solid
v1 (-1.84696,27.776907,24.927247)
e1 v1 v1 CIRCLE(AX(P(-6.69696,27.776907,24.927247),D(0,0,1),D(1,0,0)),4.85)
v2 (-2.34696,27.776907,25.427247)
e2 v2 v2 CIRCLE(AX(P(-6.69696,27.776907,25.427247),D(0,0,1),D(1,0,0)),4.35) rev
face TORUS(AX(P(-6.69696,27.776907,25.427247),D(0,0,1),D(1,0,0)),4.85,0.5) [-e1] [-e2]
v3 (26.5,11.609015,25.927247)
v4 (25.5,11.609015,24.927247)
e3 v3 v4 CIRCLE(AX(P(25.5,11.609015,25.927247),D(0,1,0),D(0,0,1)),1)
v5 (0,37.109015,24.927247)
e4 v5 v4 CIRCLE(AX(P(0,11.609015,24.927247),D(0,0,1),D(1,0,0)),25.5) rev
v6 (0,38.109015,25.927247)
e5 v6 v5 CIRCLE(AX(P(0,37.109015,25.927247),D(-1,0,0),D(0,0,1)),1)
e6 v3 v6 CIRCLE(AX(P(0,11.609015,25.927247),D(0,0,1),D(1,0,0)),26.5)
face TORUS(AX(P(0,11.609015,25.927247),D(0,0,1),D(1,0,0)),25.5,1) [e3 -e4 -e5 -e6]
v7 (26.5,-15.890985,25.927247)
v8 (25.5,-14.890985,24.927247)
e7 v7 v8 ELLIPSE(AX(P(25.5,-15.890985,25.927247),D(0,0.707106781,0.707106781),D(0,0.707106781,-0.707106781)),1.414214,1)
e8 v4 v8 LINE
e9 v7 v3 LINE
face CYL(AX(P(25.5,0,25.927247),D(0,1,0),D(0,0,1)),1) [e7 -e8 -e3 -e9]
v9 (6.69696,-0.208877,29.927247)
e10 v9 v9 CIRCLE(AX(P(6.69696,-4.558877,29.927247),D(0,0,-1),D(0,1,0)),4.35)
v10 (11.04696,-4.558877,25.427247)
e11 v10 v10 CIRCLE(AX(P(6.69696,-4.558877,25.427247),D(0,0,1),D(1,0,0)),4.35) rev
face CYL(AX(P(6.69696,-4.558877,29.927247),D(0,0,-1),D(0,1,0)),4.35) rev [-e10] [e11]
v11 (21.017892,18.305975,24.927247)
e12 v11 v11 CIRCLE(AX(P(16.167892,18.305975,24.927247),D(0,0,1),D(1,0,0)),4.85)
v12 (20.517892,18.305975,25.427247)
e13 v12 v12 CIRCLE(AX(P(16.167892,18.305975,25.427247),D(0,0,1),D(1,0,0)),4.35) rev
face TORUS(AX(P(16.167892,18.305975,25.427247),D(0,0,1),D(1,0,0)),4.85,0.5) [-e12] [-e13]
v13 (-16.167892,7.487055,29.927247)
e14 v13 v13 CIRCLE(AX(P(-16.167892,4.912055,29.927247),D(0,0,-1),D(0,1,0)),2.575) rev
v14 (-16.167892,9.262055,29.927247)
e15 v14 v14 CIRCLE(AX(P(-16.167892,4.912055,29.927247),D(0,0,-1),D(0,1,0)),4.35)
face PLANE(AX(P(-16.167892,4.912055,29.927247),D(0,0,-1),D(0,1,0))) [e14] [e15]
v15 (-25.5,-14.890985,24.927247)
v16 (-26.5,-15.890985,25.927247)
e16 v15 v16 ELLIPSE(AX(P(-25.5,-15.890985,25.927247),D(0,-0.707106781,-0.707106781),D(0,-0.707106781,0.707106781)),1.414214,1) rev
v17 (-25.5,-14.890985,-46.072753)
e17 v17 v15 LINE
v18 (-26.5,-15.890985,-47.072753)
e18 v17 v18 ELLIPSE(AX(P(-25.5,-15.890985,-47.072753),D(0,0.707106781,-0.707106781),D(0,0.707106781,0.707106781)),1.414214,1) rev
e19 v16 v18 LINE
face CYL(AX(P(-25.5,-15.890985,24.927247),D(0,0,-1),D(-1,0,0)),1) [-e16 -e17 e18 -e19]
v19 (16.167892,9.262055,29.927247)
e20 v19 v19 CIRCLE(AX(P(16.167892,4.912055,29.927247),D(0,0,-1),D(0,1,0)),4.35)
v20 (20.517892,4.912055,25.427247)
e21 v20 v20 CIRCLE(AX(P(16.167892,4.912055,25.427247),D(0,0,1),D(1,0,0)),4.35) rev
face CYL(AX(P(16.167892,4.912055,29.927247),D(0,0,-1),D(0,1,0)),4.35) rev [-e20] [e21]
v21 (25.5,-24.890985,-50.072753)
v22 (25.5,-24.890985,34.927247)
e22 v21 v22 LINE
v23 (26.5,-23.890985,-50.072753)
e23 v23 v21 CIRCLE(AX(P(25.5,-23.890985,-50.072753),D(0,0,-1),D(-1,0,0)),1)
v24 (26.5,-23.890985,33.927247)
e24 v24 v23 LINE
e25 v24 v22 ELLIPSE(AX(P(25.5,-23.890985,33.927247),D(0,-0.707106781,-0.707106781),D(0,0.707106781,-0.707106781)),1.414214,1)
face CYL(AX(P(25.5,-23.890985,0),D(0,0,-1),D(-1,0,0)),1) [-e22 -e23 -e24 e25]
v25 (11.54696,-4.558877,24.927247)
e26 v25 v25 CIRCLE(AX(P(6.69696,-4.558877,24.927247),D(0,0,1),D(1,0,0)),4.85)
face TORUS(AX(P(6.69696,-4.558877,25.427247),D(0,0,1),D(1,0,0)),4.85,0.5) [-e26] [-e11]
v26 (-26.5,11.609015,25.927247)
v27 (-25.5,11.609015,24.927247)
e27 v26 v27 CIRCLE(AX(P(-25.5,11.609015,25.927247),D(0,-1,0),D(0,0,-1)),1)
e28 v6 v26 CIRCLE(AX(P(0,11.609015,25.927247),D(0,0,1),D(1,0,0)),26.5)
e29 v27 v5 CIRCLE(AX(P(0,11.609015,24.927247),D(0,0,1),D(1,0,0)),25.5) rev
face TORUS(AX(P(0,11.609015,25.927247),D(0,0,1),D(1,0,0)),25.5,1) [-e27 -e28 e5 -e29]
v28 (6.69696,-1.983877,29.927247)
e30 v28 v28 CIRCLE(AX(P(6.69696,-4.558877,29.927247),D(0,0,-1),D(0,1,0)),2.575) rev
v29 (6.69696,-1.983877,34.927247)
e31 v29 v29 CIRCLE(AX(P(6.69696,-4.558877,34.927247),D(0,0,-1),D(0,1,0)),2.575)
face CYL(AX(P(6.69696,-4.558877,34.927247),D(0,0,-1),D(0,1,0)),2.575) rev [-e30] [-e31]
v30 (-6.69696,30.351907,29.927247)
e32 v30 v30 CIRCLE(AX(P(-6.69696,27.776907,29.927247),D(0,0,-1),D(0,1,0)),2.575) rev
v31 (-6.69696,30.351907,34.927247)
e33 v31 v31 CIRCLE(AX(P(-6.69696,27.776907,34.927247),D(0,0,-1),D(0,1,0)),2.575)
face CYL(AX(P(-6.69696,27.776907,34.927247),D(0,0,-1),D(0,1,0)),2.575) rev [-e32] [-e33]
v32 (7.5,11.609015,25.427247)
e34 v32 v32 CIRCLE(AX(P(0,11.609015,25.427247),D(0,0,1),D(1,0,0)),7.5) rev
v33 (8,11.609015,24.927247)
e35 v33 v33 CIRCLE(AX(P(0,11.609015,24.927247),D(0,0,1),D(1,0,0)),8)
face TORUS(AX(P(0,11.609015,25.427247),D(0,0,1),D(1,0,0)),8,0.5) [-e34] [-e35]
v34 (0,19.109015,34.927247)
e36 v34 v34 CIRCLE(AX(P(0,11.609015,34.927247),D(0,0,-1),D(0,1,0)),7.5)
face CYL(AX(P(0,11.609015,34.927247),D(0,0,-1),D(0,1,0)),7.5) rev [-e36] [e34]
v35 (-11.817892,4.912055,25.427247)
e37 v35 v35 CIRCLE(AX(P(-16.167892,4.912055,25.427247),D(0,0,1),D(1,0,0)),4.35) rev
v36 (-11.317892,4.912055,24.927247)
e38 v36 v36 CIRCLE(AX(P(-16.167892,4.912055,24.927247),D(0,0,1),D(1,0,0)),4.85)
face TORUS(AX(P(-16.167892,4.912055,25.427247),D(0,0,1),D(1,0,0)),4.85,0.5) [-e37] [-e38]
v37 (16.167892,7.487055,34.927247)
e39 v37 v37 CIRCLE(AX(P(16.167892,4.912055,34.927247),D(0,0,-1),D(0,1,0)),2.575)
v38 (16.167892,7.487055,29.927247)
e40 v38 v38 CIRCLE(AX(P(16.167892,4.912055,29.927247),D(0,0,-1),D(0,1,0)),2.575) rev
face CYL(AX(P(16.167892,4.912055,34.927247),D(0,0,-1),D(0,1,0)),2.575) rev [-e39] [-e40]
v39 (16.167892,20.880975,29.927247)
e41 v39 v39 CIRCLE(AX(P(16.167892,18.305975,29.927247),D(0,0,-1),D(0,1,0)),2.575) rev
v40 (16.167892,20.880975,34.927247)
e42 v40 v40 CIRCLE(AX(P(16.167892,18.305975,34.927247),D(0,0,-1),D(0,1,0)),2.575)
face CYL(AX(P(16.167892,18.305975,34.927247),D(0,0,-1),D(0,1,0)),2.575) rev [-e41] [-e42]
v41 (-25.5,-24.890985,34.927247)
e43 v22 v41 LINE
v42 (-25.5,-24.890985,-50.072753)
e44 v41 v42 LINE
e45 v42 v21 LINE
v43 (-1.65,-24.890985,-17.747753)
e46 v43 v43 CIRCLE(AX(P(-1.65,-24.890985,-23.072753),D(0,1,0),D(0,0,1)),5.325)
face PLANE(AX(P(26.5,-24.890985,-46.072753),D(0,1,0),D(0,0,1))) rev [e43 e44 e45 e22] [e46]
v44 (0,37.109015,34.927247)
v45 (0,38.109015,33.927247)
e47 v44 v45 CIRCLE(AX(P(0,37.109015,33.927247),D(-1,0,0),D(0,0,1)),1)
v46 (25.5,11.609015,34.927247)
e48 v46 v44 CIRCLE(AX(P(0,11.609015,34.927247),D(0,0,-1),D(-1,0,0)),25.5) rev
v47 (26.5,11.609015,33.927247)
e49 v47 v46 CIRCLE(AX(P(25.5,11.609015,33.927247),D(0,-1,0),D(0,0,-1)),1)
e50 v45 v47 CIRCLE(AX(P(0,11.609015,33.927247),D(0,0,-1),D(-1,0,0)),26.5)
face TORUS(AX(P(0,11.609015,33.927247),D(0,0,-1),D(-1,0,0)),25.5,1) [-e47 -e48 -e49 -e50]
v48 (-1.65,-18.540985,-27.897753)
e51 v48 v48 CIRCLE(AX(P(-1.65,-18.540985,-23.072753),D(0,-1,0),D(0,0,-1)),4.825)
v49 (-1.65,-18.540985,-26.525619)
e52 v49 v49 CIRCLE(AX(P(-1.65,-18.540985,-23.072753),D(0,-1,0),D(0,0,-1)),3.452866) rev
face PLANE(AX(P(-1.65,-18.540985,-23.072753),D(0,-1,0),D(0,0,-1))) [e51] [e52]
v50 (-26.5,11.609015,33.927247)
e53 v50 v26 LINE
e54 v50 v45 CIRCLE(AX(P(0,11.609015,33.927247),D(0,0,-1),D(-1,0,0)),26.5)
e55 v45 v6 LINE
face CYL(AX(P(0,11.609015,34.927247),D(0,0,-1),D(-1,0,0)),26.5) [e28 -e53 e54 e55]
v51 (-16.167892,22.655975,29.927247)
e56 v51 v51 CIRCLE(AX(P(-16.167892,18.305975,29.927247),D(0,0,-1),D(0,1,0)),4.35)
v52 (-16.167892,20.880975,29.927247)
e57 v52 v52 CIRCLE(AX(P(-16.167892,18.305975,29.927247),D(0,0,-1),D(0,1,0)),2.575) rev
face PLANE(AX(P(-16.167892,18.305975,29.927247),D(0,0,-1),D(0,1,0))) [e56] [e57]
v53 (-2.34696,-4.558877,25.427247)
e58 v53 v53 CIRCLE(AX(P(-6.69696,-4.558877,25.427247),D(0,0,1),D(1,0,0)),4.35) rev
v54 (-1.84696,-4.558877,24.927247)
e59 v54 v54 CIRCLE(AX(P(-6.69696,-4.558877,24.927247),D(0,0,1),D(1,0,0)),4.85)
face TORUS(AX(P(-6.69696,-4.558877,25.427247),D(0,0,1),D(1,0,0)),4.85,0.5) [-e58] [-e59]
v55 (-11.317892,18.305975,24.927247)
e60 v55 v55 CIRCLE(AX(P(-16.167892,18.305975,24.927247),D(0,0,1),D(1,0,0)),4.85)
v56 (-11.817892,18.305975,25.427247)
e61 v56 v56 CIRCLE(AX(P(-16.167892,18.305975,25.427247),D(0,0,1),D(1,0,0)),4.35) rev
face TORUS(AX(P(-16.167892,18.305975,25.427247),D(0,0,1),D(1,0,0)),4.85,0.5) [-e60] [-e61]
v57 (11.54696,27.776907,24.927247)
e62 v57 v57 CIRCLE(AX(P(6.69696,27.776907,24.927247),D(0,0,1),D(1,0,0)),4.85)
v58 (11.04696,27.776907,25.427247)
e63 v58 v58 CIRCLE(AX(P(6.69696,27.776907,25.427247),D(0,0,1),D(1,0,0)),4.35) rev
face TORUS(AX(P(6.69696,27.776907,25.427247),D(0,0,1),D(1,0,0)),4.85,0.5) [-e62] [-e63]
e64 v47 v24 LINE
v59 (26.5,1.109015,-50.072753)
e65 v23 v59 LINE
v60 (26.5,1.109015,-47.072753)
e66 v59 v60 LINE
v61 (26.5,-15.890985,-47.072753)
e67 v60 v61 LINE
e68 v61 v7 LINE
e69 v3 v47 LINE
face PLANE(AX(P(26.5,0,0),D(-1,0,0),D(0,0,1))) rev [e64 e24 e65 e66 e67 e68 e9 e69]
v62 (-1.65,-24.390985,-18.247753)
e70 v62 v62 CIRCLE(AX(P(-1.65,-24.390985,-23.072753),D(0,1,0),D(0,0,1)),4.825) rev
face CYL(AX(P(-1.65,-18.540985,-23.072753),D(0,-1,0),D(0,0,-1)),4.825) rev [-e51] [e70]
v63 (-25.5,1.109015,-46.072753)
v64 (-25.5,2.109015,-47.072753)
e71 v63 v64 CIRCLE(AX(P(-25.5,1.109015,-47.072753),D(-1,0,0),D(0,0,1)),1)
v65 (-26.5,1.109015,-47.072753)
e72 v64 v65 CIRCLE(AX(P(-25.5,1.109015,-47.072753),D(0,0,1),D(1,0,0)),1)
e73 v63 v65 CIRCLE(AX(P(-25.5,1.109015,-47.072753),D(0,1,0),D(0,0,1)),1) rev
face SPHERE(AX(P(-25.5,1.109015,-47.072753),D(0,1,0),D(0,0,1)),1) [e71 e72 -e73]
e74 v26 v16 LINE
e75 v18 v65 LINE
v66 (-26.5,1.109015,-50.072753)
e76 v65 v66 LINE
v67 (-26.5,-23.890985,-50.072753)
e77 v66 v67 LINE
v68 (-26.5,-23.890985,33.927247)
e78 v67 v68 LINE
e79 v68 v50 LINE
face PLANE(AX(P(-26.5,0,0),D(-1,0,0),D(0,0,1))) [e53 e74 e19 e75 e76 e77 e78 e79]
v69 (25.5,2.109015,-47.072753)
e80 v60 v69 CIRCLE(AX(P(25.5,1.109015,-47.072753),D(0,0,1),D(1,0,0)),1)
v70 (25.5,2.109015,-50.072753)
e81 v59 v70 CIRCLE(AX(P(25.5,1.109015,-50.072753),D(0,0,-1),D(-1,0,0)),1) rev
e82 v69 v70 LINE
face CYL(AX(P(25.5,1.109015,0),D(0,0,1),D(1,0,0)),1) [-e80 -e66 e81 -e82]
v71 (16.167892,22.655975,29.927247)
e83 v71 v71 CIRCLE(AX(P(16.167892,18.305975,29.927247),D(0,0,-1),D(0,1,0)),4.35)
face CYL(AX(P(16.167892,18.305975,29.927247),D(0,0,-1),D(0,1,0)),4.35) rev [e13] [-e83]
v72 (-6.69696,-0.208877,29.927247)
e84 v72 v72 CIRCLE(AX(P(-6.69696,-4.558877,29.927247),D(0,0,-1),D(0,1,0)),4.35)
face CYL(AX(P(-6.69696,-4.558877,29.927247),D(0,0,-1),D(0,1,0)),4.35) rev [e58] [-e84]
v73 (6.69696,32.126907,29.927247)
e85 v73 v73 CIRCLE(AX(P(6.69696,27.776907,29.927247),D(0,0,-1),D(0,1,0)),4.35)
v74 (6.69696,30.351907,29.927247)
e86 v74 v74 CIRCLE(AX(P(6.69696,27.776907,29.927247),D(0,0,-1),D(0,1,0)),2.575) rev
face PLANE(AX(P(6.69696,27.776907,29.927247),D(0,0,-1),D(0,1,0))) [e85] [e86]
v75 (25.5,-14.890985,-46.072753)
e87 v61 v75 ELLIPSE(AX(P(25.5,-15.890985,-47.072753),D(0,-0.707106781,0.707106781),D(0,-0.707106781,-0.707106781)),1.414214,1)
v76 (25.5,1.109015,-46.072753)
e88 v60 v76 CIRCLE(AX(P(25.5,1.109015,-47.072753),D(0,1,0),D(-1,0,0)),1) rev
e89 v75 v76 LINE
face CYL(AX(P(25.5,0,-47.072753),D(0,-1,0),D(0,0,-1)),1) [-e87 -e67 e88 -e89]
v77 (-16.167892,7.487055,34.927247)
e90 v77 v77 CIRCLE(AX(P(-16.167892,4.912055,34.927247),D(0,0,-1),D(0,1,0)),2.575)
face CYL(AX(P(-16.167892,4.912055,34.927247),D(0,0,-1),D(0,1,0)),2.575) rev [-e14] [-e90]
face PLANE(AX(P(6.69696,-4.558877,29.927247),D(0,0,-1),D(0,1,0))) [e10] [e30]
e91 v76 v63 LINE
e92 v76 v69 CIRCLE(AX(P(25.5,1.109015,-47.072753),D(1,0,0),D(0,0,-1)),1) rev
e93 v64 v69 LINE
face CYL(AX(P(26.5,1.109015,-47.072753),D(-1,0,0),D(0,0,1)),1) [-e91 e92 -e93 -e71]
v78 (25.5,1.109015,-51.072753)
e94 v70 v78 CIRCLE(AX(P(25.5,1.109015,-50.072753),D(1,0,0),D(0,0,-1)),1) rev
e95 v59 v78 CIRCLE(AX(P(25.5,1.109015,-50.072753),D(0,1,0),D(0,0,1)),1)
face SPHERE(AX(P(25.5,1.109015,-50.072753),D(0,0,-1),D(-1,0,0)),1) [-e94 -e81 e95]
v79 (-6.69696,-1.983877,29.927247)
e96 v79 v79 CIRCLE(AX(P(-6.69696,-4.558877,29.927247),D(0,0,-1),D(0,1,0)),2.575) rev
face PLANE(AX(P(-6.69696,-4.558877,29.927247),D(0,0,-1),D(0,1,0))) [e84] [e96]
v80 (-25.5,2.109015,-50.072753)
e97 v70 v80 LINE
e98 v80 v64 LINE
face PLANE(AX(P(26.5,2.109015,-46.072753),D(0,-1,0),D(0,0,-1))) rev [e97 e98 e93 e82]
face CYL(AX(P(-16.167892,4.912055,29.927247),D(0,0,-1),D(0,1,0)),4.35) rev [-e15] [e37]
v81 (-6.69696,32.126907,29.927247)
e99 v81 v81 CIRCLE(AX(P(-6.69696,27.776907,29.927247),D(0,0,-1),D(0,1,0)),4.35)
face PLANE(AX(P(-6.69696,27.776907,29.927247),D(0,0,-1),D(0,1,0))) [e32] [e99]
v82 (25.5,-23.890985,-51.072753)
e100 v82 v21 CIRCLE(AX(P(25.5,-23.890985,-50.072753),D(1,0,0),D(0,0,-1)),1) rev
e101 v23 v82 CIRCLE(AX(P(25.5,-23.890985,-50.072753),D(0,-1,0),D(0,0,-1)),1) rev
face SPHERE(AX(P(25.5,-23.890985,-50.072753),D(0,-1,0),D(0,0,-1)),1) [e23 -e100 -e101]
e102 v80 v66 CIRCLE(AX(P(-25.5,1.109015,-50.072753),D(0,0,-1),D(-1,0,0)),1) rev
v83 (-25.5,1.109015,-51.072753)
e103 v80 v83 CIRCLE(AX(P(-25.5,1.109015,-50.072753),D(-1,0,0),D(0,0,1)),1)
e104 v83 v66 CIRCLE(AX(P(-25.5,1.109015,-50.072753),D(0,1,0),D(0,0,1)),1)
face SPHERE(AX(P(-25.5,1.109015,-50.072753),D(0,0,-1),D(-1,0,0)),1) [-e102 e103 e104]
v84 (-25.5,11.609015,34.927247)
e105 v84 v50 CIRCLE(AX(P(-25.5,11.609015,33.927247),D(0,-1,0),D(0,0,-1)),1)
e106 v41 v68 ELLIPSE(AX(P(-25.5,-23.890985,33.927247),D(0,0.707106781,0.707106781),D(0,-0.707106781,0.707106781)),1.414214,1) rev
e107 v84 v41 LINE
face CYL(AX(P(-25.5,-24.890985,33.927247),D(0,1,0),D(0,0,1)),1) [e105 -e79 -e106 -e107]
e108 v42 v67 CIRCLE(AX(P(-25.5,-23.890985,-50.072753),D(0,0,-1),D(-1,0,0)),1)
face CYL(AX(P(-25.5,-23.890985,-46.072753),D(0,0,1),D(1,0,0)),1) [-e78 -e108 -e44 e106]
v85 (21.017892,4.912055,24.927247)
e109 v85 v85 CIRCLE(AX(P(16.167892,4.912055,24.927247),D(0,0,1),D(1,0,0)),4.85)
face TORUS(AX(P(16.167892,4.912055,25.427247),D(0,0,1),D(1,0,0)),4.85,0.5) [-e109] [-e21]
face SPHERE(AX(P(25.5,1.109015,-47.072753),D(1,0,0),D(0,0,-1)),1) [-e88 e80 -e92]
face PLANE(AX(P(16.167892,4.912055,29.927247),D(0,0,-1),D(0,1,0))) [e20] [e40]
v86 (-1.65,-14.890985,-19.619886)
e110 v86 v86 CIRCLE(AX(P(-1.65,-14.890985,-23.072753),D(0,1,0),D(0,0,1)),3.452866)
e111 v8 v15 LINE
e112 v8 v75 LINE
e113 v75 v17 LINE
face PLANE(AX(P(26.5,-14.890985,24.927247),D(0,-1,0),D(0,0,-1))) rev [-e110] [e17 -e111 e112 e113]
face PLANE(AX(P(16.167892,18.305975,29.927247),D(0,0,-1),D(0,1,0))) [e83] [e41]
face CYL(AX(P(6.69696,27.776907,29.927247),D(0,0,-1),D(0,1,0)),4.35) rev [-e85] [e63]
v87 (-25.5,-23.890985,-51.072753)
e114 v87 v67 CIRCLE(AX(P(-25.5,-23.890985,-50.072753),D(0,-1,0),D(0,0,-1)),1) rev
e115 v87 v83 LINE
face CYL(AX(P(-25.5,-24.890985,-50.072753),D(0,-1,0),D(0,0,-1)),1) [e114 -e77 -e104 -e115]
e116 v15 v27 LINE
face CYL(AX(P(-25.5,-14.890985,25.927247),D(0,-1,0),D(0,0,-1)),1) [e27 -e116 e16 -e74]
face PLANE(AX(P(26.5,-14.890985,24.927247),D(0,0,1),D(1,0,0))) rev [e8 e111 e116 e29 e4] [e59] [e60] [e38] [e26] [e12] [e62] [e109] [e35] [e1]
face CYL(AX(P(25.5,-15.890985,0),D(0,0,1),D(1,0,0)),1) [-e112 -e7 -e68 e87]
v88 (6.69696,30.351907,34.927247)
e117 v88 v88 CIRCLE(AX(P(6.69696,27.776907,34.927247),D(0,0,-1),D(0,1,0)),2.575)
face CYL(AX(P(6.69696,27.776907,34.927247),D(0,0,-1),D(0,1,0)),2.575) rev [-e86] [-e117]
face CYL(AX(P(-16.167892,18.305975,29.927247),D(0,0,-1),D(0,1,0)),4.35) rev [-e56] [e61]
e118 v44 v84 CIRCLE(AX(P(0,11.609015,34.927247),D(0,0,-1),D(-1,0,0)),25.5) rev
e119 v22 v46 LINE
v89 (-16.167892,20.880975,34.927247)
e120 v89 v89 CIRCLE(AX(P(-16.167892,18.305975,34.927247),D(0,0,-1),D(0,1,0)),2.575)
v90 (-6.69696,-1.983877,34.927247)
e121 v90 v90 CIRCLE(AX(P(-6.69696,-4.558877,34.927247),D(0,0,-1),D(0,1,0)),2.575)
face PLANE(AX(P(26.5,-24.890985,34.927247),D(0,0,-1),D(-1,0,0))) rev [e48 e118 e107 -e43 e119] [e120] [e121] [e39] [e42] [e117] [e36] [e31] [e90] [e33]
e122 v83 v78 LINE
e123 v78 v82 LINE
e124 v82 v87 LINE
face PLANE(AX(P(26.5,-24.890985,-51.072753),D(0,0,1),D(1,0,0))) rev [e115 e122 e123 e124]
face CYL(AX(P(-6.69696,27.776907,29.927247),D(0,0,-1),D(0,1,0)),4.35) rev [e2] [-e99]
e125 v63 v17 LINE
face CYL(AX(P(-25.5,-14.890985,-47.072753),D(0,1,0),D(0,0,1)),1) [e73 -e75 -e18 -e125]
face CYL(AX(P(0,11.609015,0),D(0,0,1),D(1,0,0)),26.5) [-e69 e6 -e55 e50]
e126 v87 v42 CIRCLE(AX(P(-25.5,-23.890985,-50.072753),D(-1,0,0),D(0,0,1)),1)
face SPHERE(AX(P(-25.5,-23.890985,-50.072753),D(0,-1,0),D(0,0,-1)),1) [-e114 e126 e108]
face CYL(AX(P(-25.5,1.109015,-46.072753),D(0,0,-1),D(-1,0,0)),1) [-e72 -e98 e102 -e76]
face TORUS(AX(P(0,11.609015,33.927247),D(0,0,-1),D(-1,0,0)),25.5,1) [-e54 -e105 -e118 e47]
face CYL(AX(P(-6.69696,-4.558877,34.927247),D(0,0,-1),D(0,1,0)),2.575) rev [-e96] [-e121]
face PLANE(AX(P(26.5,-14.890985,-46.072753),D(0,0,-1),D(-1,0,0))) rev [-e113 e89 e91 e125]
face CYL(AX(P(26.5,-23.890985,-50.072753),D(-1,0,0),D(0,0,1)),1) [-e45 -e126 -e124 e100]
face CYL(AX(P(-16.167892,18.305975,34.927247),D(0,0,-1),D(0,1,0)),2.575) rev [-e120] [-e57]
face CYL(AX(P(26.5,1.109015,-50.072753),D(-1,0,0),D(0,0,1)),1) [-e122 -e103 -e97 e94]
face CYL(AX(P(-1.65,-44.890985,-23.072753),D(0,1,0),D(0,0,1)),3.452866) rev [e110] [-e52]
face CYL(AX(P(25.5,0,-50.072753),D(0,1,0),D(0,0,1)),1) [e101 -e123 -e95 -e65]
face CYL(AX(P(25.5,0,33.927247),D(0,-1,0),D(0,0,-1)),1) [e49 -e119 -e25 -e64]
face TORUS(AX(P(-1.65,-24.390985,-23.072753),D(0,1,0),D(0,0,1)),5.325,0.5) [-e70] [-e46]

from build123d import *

# Parameters (mm, degrees)
BOSS_EXTRUDE1_DEPTH = 26.5
SKETCH3_R           = 2.575
SKETCH3_R_2         = 7.5
CUT_EXTRUDE1_DEPTH  = 90.053618868
SKETCH4_R           = 4.35
SKETCH4_R_2         = 7.5
CUT_EXTRUDE2_DEPTH  = 5
FILLET1_R           = 26.5
SKETCH9_R           = 3.452866181
CUT_EXTRUDE8_DEPTH  = 30
SKETCH10_R          = 4.825
CUT_EXTRUDE9_DEPTH  = 6.35
FILLET2_R           = 1
FILLET3_R           = 0.5


with BuildPart() as part:
    # Sketch2 → Boss-Extrude1 (new, symmetric)
    with BuildSketch(Plane(origin=(0, 0, 0), x_dir=(0, 0, -1), z_dir=(1, 0, 0))):
        Polygon((-34.927247405, -24.890984879), (-24.927247405, -24.890984879), (46.072752595, -24.890984879), (51.072752595, -24.890984879), (51.072752595, 2.109015121), (46.072752595, 2.109015121), (46.072752595, -14.890984879), (-24.927247405, -14.890984879), (-24.927247405, 38.109015121), (-34.927247405, 38.109015121), align=None)
    extrude(amount=BOSS_EXTRUDE1_DEPTH, both=True)

    # Sketch3 → Cut-Extrude1 (cut, through all)
    with BuildSketch(Plane(origin=(0, 0, 24.927247405), x_dir=(-1, 0, 0), z_dir=(0, 0, -1))):
        with Locations(Location((-6.696960066, 27.77690694, 0), (0, 0, 90))):
            Circle(SKETCH3_R)
        with Locations(Location((0, 11.609015121, 0), (0, 0, 90))):
            Circle(SKETCH3_R_2)
        with Locations(Location((6.696960066, 27.77690694, 0), (0, 0, 90))):
            Circle(SKETCH3_R)
        with Locations(Location((16.167891819, 18.305975187, 0), (0, 0, 90))):
            Circle(SKETCH3_R)
        with Locations(Location((16.167891819, 4.912055054, 0), (0, 0, 90))):
            Circle(SKETCH3_R)
        with Locations(Location((6.696960066, -4.558876698, 0), (0, 0, 90))):
            Circle(SKETCH3_R)
        with Locations(Location((-6.696960066, -4.558876698, 0), (0, 0, 90))):
            Circle(SKETCH3_R)
        with Locations(Location((-16.167891819, 4.912055054, 0), (0, 0, 90))):
            Circle(SKETCH3_R)
        with Locations(Location((-16.167891819, 18.305975187, 0), (0, 0, 90))):
            Circle(SKETCH3_R)
    extrude(amount=-CUT_EXTRUDE1_DEPTH, mode=Mode.SUBTRACT)

    # Sketch4 → Cut-Extrude2 (cut)
    with BuildSketch(Plane(origin=(0, 0, 24.927247405), x_dir=(-1, 0, 0), z_dir=(0, 0, -1))):
        with Locations(Location((6.696960066, -4.558876698, 0), (0, 0, 90))):
            Circle(SKETCH4_R)
        with Locations(Location((16.167891819, 18.305975187, 0), (0, 0, 90))):
            Circle(SKETCH4_R)
        with Locations(Location((6.696960066, 27.77690694, 0), (0, 0, 90))):
            Circle(SKETCH4_R)
        with Locations(Location((0, 11.609015121, 0), (0, 0, 90))):
            Circle(SKETCH4_R_2)
        with Locations(Location((-6.696960066, 27.77690694, 0), (0, 0, 90))):
            Circle(SKETCH4_R)
        with Locations(Location((-16.167891819, 18.305975187, 0), (0, 0, 90))):
            Circle(SKETCH4_R)
        with Locations(Location((-16.167891819, 4.912055054, 0), (0, 0, 90))):
            Circle(SKETCH4_R)
        with Locations(Location((-6.696960066, -4.558876698, 0), (0, 0, 90))):
            Circle(SKETCH4_R)
        with Locations(Location((16.167891819, 4.912055054, 0), (0, 0, 90))):
            Circle(SKETCH4_R)
    extrude(amount=-CUT_EXTRUDE2_DEPTH, mode=Mode.SUBTRACT)

    # Fillet1
    fillet1_edges = [part.edges().sort_by_distance(p)[0] for p in [
        (-26.5, 38.109015121, 29.927247405),
        (26.5, 38.109015121, 29.927247405),
    ]]
    fillet(fillet1_edges, radius=FILLET1_R - 0.0001)  # a hair under: the kernel refuses the full size

    # Sketch9 → Cut-Extrude8 (cut)
    with BuildSketch(Plane(origin=(0, -14.890984879, 0), x_dir=(1, 0, 0), z_dir=(0, 1, 0))):
        with Locations(Location((-1.65, 23.072752595, 0), (0, 0, 270))):
            Circle(SKETCH9_R)
    extrude(amount=-CUT_EXTRUDE8_DEPTH, mode=Mode.SUBTRACT)

    # Sketch10 → Cut-Extrude9 (cut)
    with BuildSketch(Plane.XZ.offset(24.890984879)):
        with Locations(Location((-1.65, -23.072752595, 0), (0, 0, 270))):
            Circle(SKETCH10_R)
    extrude(amount=-CUT_EXTRUDE9_DEPTH, mode=Mode.SUBTRACT)

    # Fillet2
    fillet2_edges = [part.edges().sort_by_distance(p)[0] for p in [
        (-26.5, -14.890984879, -10.572752595),
        (-26.5, -6.390984879, -46.072752595),
        (-26.5, 2.109015121, -48.572752595),
        (-26.5, -11.390984879, -51.072752595),
        (-26.5, -6.640934879, 34.927247405),
        (26.5, -6.640934879, 34.927247405),
        (-26.5, -24.890984879, -8.072752595),
        (18.738358991, 30.347374111, 34.927247405),
        (-18.738358991, 30.347374111, 34.927247405),
        (18.738358991, 30.347374111, 24.927247405),
        (-18.738358991, 30.347374111, 24.927247405),
        (-26.5, -1.640934879, 24.927247405),
        (26.5, -24.890984879, -8.072752595),
        (0, 2.109015121, -46.072752595),
        (0, 2.109015121, -51.072752595),
        (0, -24.890984879, -51.072752595),
        (26.5, -11.390984879, -51.072752595),
        (26.5, 2.109015121, -48.572752595),
        (26.5, -6.390984879, -46.072752595),
        (26.5, -14.890984879, -10.572752595),
        (26.5, -1.640934879, 24.927247405),
    ]]
    fillet(fillet2_edges, radius=FILLET2_R)

    # Fillet3
    fillet3_edges = [part.edges().sort_by_distance(p)[0] for p in [
        (-6.696960066, -8.908876698, 24.927247405),
        (-1.65, -24.890984879, -18.247752595),
        (0, 4.109015121, 24.927247405),
        (6.696960066, 23.42690694, 24.927247405),
        (-6.696960066, 23.42690694, 24.927247405),
        (-16.167891819, 13.955975187, 24.927247405),
        (16.167891819, 13.955975187, 24.927247405),
        (16.167891819, 0.562055054, 24.927247405),
        (6.696960066, -8.908876698, 24.927247405),
        (-16.167891819, 0.562055054, 24.927247405),
    ]]
    fillet(fillet3_edges, radius=FILLET3_R)


solid = part.part
